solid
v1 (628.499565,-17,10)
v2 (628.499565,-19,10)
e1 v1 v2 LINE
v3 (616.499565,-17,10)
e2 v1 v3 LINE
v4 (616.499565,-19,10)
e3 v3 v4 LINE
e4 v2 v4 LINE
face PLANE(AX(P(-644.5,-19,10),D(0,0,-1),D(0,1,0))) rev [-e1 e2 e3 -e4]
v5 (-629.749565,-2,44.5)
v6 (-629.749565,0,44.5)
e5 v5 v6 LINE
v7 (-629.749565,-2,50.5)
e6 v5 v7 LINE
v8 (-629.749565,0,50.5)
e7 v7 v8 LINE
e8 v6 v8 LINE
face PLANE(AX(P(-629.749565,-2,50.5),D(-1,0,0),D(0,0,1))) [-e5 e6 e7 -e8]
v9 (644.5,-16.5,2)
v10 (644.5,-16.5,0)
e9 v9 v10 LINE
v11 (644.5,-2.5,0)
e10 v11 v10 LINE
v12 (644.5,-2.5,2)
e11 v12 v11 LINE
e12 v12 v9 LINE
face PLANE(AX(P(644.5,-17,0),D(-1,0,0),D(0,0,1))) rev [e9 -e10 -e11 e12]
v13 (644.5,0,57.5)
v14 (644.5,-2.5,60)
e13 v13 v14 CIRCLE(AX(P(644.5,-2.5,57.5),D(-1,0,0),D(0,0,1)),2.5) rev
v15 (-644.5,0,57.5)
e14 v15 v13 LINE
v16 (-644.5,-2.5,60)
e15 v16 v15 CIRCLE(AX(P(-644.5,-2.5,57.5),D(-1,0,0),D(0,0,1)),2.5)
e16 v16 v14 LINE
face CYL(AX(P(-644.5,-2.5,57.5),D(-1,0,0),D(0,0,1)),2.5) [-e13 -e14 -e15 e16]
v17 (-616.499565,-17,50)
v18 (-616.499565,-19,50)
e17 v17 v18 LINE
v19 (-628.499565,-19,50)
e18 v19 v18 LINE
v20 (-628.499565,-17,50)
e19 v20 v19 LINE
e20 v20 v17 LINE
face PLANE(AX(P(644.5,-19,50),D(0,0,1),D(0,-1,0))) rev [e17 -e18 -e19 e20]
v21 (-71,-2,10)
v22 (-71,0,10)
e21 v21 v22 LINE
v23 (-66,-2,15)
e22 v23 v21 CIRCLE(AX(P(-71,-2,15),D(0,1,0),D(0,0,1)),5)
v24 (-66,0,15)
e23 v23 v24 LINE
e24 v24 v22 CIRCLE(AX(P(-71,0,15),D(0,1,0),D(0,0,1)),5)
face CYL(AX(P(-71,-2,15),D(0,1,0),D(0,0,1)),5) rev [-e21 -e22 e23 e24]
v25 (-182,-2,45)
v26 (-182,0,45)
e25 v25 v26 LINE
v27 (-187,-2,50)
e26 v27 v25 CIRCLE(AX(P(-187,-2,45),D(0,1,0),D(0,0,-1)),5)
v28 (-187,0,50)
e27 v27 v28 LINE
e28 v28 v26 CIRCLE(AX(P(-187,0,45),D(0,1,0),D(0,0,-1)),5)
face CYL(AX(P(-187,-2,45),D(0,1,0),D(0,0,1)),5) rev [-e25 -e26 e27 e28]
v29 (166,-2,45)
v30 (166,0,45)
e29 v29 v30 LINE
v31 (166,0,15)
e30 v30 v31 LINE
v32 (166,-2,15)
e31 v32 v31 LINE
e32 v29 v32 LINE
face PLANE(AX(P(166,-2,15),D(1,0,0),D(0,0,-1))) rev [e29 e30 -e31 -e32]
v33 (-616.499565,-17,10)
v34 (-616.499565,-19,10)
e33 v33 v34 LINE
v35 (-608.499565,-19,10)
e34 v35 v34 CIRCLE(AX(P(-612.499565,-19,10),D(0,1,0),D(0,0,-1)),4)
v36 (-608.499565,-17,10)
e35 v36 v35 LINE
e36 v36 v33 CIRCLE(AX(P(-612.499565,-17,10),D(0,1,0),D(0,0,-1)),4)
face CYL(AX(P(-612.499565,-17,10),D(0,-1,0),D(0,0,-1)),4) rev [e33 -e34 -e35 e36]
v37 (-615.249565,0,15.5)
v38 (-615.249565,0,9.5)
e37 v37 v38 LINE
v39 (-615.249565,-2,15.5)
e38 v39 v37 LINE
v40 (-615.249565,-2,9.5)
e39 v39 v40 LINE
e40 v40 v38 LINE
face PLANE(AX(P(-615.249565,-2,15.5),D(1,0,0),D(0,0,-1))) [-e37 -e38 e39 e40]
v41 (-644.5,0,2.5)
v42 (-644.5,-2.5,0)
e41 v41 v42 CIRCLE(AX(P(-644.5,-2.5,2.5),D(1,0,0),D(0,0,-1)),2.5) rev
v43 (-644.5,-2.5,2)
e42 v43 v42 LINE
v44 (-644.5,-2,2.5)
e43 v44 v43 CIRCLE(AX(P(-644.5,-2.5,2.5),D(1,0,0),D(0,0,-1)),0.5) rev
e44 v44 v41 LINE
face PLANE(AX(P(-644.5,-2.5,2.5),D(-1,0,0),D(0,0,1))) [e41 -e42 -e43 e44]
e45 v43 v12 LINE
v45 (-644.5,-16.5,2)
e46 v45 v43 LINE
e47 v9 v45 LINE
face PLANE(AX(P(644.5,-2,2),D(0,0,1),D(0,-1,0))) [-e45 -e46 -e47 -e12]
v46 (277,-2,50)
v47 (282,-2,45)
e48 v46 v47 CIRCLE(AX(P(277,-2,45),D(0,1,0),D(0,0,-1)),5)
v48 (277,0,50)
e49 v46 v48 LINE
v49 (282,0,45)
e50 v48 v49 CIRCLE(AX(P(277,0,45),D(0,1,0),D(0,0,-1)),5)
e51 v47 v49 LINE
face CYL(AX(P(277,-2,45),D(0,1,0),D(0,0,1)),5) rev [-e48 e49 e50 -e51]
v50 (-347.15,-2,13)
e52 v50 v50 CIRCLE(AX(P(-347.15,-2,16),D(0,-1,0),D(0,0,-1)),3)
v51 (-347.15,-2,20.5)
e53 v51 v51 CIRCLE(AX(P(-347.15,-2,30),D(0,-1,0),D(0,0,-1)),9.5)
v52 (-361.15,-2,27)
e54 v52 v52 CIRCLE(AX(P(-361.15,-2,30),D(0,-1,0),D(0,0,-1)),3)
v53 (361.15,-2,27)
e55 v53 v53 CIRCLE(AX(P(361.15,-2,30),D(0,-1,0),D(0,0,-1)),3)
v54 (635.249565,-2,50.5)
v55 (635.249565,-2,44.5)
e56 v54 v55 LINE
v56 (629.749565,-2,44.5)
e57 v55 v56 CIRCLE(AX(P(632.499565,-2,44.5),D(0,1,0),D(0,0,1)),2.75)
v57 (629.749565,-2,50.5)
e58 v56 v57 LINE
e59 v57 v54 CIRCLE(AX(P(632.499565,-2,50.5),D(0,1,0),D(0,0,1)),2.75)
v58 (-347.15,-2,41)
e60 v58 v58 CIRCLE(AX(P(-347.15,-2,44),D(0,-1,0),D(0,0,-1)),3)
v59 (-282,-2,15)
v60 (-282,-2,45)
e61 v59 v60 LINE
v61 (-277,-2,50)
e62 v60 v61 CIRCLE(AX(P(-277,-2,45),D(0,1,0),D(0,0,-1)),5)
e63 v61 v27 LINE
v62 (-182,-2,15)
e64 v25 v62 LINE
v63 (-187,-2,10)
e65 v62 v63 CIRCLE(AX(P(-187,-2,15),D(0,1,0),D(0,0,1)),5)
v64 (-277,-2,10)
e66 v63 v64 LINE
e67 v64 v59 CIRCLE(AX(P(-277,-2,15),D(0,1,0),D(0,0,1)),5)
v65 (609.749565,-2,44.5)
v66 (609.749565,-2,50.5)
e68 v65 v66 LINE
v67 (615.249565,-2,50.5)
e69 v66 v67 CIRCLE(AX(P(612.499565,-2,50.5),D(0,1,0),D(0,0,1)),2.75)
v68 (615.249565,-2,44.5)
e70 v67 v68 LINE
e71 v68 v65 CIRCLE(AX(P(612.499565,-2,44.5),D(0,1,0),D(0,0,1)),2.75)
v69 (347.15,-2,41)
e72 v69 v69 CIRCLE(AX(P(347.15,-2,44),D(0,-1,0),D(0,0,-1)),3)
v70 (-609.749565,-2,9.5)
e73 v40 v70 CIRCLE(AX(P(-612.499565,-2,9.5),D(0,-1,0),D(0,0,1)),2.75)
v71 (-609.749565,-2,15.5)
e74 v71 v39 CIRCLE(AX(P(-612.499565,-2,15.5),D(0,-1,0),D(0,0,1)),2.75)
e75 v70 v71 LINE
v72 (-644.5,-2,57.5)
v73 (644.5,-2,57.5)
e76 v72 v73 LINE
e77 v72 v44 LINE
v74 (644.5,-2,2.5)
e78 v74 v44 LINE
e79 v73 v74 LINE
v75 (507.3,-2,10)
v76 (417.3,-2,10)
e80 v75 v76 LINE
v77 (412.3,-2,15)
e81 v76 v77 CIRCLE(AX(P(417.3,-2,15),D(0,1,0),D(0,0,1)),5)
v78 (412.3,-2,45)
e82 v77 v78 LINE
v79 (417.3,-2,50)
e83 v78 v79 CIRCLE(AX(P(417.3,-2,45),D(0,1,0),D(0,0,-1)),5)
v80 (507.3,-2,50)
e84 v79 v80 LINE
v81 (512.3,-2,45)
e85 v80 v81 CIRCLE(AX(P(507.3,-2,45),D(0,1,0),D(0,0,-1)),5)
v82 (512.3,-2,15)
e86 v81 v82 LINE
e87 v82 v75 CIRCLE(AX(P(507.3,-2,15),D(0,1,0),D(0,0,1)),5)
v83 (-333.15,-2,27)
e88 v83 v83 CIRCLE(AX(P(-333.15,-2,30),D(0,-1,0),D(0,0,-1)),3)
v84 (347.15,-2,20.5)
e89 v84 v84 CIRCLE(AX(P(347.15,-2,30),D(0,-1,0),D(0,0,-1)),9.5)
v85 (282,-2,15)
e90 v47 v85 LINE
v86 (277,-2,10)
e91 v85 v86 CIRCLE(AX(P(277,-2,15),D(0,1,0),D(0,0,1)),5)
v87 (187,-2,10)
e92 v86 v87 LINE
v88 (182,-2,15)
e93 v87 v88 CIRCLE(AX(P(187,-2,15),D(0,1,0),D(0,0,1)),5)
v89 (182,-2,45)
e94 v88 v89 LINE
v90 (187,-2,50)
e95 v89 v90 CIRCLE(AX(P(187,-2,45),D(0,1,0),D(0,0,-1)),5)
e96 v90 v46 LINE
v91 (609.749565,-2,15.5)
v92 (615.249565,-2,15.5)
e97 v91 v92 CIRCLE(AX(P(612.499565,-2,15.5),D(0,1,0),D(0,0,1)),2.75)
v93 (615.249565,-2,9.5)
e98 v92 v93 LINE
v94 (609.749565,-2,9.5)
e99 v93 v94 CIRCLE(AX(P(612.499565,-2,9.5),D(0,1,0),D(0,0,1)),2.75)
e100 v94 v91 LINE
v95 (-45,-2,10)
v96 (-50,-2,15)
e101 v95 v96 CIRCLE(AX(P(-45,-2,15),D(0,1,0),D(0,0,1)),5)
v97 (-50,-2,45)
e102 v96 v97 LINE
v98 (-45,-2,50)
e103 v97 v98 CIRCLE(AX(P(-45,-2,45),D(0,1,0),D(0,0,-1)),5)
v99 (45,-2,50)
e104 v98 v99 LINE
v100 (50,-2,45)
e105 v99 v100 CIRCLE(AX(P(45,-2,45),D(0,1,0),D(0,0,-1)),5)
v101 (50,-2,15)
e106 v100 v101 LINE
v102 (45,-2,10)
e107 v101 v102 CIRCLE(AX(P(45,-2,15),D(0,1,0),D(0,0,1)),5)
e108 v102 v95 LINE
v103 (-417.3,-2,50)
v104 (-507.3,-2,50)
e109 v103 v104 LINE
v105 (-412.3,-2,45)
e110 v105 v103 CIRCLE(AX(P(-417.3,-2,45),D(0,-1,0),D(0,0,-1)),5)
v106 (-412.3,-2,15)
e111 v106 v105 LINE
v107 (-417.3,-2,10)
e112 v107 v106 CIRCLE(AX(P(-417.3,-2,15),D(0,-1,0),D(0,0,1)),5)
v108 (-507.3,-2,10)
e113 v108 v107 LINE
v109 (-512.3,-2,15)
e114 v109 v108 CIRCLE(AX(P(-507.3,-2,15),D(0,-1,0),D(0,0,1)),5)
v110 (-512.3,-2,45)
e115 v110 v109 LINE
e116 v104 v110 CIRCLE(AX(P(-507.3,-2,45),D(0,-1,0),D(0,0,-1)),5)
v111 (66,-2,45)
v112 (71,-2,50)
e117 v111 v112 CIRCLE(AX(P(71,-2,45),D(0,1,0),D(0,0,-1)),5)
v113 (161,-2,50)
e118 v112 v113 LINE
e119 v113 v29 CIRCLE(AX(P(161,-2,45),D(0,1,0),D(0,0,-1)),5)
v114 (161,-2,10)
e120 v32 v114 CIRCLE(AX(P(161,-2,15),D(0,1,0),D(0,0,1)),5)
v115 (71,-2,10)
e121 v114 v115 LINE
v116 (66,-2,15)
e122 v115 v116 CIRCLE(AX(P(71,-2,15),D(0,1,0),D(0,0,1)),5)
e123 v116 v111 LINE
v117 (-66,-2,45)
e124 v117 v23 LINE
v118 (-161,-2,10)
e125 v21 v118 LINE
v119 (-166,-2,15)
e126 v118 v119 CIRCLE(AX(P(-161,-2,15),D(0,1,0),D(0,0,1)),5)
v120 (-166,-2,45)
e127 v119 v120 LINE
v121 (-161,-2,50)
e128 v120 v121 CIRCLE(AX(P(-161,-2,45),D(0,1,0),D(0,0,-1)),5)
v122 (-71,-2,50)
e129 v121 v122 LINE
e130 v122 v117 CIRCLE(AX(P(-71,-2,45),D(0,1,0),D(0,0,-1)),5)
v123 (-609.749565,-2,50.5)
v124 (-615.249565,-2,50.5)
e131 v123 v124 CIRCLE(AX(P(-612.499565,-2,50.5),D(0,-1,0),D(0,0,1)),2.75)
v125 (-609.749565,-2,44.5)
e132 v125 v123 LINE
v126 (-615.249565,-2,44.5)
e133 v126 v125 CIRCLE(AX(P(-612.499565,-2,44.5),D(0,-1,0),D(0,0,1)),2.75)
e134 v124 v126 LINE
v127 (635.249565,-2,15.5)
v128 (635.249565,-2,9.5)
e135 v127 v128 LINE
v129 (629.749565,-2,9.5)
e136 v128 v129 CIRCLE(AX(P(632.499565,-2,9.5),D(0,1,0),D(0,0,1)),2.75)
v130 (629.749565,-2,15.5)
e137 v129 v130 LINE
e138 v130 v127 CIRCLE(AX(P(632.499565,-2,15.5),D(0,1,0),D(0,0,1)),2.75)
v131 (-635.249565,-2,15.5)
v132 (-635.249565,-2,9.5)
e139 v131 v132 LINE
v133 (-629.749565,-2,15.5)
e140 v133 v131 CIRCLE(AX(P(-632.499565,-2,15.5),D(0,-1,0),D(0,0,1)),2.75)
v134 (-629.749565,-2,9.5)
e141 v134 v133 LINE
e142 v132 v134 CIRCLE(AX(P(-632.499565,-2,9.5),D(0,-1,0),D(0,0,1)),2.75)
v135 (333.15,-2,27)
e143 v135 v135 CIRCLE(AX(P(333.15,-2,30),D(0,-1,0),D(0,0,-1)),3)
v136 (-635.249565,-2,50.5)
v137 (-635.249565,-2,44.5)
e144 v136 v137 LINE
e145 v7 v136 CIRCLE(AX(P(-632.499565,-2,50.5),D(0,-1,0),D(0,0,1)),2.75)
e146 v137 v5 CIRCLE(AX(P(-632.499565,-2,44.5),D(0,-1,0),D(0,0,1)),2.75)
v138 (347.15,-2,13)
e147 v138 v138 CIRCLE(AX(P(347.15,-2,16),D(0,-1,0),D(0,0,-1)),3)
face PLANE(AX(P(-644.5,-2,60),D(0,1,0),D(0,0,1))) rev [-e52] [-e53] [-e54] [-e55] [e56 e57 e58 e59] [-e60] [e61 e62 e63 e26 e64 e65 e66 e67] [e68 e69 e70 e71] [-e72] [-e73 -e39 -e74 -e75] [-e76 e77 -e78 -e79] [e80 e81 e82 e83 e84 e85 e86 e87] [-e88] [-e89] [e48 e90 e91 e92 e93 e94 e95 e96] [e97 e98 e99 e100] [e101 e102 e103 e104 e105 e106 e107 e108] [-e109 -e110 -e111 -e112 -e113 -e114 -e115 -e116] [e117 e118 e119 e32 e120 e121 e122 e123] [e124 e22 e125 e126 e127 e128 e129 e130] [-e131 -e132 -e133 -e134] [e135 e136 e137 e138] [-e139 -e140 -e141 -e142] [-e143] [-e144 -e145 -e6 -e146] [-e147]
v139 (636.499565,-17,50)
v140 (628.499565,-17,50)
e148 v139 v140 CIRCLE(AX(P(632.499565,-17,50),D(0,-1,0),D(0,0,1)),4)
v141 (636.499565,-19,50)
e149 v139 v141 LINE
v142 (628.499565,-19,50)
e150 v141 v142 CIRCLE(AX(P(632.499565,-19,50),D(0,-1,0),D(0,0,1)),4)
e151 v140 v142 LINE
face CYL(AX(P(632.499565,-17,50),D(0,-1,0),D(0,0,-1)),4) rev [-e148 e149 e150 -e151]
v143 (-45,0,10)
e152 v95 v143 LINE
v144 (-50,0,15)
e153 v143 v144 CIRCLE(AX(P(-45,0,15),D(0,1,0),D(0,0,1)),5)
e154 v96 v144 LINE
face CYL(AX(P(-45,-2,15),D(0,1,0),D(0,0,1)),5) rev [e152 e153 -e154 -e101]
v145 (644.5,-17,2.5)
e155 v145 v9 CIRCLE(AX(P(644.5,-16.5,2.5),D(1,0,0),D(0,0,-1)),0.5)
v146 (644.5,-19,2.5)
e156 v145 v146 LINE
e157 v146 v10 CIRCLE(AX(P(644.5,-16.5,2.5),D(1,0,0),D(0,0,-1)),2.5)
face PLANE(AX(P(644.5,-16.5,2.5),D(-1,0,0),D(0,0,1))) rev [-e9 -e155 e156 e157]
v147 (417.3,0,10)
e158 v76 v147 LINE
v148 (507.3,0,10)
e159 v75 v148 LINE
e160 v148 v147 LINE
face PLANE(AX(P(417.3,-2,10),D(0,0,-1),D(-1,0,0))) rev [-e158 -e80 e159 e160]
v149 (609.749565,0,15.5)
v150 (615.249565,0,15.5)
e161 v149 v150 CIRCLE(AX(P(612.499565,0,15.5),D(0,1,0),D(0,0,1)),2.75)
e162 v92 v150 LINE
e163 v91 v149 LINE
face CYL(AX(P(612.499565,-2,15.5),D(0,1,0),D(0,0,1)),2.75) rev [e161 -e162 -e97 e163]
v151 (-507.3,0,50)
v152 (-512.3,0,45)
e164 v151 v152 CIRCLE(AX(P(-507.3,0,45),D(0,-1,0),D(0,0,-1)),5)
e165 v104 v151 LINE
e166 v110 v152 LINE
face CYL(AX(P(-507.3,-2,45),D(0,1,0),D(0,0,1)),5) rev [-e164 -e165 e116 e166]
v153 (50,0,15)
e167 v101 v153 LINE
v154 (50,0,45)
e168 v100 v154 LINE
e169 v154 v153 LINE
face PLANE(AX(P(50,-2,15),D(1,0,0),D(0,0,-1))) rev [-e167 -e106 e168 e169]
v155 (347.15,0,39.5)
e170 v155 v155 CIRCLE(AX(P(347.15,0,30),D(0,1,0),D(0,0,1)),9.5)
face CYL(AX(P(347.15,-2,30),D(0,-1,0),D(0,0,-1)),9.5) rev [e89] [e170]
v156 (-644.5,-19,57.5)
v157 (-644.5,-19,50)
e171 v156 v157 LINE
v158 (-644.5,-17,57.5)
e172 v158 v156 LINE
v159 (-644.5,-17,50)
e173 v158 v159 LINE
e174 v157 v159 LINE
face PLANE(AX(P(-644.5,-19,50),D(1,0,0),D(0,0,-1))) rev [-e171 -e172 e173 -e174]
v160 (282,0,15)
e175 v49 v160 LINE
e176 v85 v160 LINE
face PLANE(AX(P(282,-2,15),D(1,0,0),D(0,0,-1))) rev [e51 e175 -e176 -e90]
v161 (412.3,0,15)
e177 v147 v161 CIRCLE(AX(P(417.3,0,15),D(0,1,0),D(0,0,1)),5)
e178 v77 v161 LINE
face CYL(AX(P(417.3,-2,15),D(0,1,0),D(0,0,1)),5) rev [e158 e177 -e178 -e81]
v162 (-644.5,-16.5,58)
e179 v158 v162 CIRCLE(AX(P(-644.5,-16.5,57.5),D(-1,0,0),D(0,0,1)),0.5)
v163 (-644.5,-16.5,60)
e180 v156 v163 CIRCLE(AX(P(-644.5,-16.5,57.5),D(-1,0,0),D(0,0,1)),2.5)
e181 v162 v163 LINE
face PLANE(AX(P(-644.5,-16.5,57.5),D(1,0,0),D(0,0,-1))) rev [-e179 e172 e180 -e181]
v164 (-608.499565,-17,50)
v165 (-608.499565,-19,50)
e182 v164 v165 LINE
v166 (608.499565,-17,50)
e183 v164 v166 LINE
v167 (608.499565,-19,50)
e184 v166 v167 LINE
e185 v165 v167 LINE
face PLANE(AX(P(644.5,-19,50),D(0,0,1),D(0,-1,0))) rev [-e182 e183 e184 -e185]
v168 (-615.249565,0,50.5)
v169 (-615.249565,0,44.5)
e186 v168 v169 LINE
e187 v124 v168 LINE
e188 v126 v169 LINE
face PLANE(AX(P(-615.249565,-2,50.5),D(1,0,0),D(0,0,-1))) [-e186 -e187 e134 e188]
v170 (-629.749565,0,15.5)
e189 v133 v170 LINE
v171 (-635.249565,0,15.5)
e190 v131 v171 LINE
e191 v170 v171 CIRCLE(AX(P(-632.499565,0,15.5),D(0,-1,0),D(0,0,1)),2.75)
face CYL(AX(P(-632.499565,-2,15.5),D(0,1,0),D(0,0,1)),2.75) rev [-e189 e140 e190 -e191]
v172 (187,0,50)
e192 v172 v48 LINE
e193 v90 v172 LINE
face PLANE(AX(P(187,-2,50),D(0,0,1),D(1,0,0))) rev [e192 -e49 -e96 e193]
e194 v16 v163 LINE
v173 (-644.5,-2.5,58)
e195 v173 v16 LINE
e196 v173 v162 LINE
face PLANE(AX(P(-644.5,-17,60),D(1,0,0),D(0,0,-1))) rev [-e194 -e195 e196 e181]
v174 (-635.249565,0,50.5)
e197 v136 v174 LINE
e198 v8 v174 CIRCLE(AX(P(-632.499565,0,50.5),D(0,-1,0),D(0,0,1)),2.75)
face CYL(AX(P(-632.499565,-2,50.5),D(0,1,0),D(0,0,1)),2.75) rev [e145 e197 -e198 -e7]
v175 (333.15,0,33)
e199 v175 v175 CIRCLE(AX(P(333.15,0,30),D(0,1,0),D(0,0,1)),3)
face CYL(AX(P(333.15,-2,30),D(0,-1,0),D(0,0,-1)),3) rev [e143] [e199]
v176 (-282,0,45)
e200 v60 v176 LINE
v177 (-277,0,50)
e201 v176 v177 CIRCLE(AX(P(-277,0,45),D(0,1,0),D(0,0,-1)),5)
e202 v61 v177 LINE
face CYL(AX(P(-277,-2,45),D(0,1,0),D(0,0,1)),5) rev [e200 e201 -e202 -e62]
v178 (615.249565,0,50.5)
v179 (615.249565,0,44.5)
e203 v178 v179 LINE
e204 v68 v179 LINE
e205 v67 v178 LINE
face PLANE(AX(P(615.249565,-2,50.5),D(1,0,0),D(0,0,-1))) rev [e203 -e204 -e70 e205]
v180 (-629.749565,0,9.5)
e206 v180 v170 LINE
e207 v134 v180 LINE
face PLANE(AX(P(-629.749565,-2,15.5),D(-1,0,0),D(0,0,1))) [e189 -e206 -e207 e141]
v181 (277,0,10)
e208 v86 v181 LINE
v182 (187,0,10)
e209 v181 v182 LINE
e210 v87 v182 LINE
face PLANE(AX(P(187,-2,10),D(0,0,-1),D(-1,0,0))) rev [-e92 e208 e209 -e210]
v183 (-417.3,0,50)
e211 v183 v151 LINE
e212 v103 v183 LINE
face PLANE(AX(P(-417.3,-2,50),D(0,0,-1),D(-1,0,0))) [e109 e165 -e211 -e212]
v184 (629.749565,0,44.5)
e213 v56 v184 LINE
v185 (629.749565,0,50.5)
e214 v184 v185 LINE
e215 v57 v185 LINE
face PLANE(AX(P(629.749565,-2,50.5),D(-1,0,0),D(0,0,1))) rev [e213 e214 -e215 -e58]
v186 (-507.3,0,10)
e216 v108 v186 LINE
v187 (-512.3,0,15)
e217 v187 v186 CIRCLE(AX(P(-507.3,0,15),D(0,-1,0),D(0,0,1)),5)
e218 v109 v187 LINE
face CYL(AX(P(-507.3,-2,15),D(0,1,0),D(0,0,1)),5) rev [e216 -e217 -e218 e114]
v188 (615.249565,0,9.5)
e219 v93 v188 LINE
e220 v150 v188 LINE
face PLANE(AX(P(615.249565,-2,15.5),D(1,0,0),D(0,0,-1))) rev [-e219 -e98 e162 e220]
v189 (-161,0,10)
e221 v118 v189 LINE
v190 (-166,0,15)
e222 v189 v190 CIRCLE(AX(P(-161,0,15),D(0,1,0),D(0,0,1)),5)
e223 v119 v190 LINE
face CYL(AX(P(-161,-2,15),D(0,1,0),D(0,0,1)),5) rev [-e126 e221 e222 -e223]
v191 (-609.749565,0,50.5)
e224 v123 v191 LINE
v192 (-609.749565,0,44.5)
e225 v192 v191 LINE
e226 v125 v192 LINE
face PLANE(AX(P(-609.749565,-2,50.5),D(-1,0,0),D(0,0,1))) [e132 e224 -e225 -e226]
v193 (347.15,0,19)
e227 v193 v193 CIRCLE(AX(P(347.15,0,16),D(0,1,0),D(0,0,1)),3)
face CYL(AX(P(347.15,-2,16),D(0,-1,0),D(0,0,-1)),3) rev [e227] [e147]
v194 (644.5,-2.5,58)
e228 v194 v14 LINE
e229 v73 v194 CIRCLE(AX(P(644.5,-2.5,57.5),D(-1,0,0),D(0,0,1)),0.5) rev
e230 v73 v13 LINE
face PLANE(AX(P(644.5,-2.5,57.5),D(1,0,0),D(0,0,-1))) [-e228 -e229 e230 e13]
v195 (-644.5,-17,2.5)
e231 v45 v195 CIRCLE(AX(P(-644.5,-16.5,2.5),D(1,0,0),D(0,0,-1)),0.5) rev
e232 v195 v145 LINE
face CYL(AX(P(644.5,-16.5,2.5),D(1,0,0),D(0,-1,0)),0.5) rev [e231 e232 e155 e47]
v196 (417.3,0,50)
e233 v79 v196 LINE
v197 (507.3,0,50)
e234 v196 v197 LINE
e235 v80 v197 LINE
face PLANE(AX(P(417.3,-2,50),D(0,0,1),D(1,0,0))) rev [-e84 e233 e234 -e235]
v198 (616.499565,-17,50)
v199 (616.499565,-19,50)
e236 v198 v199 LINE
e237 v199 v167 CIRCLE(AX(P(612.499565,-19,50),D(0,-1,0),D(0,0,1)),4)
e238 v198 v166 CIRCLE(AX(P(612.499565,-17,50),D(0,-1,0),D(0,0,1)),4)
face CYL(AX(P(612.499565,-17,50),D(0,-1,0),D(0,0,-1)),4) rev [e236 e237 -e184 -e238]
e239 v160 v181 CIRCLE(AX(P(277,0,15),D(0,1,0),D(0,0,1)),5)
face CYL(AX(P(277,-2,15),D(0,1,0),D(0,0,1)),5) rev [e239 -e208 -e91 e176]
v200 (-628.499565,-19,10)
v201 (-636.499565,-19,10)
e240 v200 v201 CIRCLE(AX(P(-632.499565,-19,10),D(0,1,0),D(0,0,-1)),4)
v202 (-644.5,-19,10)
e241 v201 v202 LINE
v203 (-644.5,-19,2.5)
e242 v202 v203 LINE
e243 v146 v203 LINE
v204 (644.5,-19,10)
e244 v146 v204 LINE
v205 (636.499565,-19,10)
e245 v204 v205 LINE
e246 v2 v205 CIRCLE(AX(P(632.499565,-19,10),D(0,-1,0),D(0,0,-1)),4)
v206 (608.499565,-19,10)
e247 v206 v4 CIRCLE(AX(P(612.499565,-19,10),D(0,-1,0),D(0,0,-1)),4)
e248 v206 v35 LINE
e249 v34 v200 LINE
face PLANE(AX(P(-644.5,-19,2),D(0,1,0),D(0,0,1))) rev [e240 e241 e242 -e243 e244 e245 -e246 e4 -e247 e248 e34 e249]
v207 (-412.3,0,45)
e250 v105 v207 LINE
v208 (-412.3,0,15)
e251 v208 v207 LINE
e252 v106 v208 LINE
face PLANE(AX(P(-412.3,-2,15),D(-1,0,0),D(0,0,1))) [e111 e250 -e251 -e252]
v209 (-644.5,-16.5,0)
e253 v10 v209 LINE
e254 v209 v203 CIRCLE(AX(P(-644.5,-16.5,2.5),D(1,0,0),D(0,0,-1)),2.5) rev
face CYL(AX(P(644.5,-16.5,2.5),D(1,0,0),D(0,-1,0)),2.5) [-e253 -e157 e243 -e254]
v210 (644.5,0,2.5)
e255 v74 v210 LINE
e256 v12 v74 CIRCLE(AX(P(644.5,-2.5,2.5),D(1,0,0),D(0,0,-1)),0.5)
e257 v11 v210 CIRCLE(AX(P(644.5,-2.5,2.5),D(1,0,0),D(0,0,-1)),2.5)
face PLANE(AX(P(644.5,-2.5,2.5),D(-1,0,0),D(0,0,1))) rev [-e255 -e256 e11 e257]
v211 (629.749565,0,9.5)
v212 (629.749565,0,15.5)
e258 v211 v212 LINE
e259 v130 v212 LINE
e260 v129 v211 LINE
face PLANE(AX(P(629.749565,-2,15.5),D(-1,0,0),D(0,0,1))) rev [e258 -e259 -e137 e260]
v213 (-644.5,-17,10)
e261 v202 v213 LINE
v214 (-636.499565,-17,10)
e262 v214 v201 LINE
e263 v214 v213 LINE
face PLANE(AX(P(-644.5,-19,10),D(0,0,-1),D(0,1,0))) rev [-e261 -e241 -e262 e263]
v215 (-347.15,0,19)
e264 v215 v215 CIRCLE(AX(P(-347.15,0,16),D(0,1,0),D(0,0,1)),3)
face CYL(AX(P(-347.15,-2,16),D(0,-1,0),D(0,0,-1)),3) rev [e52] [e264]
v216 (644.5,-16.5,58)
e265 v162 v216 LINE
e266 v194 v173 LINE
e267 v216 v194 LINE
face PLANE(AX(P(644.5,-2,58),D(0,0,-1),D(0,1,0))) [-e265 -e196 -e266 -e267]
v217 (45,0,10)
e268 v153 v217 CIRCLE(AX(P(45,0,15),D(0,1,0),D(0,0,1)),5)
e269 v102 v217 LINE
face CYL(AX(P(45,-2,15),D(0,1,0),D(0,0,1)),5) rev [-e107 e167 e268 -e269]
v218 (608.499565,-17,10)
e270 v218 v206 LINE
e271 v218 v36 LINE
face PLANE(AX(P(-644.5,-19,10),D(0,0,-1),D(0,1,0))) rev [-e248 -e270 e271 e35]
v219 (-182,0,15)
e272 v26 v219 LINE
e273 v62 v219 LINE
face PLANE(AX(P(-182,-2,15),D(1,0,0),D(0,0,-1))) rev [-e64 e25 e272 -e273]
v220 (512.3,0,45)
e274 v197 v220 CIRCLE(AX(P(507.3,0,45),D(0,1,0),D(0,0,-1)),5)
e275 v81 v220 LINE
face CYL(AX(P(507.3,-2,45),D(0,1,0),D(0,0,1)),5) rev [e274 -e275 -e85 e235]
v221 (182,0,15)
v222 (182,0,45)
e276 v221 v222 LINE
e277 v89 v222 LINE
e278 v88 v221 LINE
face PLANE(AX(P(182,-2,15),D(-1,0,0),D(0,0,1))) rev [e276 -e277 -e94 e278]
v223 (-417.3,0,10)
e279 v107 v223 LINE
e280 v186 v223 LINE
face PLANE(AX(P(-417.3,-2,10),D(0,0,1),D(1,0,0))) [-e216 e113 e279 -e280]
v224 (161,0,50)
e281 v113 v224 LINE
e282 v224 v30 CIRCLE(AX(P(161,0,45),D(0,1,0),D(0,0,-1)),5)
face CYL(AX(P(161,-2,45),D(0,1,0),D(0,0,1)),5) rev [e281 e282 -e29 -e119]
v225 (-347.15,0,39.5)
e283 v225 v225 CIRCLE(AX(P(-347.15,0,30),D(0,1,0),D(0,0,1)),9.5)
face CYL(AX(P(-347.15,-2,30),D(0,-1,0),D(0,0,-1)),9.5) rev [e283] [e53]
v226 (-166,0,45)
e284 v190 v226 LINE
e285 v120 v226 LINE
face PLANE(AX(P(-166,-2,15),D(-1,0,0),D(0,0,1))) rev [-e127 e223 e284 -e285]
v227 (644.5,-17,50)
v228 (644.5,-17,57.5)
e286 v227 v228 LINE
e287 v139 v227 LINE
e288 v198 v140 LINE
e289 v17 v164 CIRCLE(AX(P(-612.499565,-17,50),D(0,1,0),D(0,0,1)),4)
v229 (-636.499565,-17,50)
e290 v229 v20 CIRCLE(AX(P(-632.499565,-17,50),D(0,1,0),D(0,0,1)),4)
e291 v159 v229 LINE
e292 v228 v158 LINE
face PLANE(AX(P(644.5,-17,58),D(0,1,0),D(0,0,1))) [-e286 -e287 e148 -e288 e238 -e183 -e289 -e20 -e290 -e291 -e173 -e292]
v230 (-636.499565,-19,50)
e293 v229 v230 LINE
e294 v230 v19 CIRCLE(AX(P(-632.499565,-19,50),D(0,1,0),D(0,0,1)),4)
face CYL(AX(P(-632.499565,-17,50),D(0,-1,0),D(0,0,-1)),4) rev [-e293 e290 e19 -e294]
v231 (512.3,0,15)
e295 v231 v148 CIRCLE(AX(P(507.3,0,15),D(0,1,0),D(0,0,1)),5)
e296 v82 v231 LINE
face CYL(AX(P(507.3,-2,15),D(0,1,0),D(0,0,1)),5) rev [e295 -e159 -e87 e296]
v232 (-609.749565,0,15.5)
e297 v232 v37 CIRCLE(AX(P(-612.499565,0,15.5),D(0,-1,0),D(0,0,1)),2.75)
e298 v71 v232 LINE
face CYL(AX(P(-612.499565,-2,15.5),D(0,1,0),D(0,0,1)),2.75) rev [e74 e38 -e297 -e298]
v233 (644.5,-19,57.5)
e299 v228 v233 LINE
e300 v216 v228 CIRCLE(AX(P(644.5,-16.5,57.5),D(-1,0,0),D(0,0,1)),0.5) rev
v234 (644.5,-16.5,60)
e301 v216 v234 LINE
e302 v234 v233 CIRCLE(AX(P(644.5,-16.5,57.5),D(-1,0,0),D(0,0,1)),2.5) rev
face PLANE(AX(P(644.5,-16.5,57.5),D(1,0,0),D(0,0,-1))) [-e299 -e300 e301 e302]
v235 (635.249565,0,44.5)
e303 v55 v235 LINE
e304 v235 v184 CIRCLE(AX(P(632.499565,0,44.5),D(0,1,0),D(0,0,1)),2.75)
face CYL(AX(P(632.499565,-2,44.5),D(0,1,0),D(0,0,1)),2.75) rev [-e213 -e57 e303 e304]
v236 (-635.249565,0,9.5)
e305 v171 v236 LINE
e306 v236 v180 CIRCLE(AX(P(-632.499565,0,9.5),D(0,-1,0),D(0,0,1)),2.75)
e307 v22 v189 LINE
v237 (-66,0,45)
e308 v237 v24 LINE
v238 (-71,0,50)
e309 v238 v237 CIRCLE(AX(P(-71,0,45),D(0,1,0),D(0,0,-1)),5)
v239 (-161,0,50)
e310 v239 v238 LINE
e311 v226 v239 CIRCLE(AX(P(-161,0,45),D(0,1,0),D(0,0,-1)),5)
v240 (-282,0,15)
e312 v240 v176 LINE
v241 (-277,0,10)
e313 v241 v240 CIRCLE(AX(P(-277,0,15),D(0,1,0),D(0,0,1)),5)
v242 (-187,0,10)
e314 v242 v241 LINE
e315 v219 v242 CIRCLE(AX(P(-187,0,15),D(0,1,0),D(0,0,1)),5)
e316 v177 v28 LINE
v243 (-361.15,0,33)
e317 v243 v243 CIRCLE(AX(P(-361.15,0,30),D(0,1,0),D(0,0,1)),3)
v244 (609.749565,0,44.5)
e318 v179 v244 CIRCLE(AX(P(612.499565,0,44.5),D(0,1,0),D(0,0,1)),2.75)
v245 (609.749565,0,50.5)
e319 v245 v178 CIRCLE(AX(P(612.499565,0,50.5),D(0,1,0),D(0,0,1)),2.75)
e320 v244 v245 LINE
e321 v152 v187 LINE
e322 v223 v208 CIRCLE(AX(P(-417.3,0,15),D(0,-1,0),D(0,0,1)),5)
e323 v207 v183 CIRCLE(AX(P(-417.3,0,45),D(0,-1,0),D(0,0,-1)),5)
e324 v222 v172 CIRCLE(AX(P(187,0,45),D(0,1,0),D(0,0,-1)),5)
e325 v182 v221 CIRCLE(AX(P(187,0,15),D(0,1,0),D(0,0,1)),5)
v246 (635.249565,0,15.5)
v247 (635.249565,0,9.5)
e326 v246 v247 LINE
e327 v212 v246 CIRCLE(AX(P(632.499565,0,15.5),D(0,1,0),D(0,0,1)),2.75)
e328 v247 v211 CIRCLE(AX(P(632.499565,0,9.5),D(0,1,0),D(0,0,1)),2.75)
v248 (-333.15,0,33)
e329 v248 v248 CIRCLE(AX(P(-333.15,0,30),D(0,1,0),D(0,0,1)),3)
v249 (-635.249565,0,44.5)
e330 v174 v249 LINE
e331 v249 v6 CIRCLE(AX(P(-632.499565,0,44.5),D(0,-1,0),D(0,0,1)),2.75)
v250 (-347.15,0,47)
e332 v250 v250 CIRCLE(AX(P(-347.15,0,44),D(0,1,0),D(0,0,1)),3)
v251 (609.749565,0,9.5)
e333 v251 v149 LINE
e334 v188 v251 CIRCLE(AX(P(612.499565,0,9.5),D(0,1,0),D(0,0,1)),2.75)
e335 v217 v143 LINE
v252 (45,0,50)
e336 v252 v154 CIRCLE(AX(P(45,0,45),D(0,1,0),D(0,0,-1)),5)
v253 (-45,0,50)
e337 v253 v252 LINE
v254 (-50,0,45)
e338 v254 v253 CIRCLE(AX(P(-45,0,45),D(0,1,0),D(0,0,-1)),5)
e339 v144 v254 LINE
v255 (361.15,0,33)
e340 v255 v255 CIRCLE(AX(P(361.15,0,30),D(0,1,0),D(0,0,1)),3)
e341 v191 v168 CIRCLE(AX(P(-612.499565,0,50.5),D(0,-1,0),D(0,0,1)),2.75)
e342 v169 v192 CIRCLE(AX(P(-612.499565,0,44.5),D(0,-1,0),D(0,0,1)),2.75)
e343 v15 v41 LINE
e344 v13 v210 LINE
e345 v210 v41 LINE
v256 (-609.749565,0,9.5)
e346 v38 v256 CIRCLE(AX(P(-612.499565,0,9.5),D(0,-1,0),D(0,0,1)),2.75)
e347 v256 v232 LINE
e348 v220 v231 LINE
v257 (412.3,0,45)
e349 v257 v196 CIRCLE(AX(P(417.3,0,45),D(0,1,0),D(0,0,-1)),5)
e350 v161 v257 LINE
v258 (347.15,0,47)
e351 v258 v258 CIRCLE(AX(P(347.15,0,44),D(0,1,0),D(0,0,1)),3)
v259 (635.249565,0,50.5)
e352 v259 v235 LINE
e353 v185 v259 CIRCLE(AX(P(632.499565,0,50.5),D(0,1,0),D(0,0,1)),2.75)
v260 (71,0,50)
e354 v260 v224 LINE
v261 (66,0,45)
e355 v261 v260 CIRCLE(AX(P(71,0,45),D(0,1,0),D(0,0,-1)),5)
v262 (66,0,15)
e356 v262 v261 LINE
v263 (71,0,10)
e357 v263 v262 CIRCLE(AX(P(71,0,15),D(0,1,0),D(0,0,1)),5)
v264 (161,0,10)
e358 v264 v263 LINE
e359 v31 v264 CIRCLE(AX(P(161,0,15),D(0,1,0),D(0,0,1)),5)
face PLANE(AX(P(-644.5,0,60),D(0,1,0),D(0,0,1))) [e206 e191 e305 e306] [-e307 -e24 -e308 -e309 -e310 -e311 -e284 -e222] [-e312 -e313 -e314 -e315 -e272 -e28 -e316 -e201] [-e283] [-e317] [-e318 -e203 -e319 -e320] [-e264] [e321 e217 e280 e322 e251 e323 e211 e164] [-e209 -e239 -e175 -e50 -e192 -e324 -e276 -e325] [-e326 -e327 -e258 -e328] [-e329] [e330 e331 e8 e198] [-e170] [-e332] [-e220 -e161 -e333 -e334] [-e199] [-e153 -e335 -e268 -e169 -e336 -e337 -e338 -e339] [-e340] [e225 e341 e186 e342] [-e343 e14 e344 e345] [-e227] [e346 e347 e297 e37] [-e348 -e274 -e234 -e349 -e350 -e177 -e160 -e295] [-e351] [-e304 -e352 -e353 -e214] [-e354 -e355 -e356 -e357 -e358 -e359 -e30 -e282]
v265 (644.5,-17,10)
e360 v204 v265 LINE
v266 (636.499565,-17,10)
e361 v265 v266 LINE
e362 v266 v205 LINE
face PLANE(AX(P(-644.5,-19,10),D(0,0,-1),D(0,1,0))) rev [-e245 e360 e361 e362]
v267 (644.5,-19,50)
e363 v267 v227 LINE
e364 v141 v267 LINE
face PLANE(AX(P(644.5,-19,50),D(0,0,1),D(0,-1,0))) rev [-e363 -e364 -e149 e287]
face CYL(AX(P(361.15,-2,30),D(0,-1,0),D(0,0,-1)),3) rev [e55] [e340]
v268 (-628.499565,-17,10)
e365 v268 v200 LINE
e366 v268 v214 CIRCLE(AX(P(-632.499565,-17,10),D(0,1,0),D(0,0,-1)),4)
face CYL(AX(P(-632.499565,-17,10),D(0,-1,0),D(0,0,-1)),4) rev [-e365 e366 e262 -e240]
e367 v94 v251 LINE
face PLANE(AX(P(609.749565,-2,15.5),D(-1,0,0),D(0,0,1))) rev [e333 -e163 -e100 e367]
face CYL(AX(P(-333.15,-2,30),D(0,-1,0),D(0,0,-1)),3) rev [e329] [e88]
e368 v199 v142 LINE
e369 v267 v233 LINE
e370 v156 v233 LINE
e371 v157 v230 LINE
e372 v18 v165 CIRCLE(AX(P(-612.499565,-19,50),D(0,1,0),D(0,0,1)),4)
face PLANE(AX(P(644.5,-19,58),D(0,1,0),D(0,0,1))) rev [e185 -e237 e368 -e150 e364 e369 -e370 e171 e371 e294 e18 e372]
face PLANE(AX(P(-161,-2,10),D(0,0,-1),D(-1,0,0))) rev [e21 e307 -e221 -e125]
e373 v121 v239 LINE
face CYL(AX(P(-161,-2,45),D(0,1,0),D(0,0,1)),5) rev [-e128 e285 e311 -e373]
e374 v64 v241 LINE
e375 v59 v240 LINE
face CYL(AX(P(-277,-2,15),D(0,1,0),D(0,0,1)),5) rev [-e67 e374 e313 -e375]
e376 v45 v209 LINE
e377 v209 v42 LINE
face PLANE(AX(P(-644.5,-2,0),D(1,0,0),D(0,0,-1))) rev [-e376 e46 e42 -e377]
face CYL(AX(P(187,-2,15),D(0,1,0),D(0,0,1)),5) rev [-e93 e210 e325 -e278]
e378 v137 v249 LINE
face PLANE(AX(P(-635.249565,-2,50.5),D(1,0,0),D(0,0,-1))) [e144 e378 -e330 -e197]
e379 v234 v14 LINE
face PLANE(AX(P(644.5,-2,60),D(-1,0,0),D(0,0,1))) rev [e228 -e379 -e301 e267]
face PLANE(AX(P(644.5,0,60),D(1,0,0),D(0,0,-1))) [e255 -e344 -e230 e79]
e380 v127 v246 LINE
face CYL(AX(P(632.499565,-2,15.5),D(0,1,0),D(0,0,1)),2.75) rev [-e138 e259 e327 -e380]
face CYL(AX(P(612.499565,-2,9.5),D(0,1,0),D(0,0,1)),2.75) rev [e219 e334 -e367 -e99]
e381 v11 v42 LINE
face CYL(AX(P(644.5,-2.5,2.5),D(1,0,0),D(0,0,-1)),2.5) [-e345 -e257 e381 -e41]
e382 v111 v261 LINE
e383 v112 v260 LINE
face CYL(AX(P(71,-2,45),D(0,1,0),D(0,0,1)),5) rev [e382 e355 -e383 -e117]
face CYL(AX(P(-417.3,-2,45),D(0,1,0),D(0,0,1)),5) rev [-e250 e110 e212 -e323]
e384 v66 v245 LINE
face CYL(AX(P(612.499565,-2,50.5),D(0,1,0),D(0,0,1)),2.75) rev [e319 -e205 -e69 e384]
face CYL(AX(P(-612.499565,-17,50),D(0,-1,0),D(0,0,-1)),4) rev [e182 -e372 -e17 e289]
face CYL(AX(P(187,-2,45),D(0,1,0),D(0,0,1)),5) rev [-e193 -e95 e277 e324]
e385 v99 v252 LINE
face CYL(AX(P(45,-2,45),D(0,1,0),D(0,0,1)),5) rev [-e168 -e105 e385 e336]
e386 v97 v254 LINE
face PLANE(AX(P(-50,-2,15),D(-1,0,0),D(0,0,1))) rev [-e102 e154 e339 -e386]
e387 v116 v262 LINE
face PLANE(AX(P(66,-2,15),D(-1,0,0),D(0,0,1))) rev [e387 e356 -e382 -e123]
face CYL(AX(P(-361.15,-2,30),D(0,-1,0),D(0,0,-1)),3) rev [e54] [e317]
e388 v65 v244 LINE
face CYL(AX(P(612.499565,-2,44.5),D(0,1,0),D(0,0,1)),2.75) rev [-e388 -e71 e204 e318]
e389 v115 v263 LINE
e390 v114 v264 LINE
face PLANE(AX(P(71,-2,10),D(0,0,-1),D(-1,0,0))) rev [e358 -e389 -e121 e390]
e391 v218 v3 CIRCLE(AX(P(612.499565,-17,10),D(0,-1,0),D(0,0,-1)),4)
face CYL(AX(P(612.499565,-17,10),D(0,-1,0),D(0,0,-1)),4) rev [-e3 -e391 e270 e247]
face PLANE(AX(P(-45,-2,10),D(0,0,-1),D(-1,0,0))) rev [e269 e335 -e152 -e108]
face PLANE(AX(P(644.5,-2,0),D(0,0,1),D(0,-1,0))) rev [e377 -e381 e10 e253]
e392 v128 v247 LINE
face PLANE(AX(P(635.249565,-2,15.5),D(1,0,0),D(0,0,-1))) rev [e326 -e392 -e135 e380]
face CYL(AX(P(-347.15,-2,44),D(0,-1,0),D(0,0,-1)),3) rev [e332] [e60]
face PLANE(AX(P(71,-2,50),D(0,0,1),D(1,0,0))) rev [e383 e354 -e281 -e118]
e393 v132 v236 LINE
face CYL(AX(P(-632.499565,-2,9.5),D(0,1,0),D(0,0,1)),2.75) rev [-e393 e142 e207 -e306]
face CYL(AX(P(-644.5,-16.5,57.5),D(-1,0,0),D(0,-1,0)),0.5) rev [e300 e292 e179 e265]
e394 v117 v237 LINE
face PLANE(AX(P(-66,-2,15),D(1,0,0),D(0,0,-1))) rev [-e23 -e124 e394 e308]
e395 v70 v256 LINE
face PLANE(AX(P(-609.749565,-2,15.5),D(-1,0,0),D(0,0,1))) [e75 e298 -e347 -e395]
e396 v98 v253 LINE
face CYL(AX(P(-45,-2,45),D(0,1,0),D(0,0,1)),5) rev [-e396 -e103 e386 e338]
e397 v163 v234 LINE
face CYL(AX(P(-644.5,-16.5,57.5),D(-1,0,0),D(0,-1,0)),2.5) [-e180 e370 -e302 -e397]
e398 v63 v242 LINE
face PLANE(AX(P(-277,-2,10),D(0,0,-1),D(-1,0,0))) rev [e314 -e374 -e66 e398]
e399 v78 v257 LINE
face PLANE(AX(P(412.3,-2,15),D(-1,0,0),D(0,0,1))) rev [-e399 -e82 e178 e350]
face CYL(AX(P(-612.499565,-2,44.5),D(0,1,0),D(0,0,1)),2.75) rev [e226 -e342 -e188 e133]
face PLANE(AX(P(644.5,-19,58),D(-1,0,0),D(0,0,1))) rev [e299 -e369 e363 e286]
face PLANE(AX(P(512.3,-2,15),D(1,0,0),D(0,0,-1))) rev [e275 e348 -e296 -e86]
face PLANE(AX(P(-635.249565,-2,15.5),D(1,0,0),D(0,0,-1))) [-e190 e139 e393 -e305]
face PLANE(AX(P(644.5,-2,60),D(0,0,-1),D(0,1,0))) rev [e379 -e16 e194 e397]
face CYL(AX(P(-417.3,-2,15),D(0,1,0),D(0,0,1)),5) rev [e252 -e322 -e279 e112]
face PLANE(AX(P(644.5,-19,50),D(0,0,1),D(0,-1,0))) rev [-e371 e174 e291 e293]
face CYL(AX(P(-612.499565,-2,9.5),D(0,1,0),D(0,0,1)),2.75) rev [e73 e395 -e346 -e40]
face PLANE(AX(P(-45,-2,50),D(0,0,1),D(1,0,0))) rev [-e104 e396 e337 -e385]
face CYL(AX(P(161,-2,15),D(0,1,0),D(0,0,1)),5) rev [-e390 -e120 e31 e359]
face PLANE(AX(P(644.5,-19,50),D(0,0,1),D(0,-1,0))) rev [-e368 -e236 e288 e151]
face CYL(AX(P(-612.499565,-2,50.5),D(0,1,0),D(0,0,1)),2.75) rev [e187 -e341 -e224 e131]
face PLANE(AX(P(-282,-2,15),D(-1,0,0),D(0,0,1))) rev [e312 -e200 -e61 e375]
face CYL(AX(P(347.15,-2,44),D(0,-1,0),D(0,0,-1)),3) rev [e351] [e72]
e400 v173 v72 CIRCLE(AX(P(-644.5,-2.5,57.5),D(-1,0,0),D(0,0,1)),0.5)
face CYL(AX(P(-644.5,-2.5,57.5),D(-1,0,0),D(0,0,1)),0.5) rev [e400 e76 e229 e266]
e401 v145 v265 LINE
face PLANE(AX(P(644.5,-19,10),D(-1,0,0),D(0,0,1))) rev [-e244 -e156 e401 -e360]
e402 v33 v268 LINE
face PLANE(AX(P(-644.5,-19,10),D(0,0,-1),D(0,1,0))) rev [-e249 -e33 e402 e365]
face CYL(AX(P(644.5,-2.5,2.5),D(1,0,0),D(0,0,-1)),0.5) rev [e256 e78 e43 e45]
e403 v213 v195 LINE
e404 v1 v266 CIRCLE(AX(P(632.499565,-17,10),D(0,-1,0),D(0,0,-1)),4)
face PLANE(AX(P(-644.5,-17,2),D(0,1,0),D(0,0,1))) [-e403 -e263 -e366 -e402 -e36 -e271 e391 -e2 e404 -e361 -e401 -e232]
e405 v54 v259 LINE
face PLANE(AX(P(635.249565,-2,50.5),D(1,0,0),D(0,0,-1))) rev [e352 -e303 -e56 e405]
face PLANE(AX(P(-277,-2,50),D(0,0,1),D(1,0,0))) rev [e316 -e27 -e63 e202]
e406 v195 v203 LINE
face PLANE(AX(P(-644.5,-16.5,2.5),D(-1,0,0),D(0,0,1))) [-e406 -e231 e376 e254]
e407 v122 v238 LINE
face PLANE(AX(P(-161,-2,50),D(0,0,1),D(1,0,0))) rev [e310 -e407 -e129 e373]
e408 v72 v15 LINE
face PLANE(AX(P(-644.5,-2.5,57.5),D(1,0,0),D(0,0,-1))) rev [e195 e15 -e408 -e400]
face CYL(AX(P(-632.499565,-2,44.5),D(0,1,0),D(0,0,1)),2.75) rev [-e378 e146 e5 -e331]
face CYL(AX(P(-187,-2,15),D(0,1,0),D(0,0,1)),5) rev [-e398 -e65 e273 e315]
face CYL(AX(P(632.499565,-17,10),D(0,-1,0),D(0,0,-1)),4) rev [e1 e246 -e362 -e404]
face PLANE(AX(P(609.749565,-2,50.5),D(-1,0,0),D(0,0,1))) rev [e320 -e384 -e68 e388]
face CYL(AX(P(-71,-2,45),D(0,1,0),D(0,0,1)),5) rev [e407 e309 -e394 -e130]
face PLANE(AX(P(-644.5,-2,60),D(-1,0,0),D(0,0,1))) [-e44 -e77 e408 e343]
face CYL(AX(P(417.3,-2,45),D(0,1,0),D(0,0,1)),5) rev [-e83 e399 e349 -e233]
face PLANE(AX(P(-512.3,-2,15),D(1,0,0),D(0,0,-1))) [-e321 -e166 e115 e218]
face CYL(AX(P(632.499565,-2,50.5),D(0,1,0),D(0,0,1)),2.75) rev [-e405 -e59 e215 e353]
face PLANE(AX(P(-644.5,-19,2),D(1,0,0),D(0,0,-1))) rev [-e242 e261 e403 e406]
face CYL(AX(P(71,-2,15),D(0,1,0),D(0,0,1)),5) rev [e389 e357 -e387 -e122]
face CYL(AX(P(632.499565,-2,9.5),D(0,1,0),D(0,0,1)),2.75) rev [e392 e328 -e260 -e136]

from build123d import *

# Parameters (mm, degrees)
SKETCH_1_W                       = 1289
SKETCH_1_H                       = 2
SM_BASE_FLANGE_1_DEPTH           = 60
SM_EDGE_FLANGE_1_STRIP_W         = 9
SM_EDGE_FLANGE_1_STRIP_H         = 2
SM_EDGE_FLANGE_1_STRIP_CUT_DEPTH = 1289
SM_EDGE_FLANGE_1_DEPTH           = 1289
SM_EDGE_FLANGE_2_STRIP_W         = 9
SM_EDGE_FLANGE_2_STRIP_H         = 2
SM_EDGE_FLANGE_2_STRIP_CUT_DEPTH = 1289
SM_EDGE_FLANGE_2_DEPTH           = 1289
SM_EDGE_FLANGE_3_STRIP_W         = 9
SM_EDGE_FLANGE_3_STRIP_H         = 2
SM_EDGE_FLANGE_3_STRIP_CUT_DEPTH = 1289
SM_EDGE_FLANGE_3_DEPTH           = 1289
SM_EDGE_FLANGE_4_STRIP_W         = 9
SM_EDGE_FLANGE_4_STRIP_H         = 2
SM_EDGE_FLANGE_4_STRIP_CUT_DEPTH = 1289
SM_EDGE_FLANGE_4_DEPTH           = 1289
HOLE_WIZARD_19_0_19_1_D          = 19
HOLE_WIZARD_6_0_6_1_AT_2_COUNT   = 2
HOLE_WIZARD_6_0_6_1_AT_2_PITCH   = 28
HOLE_WIZARD_6_0_6_1_AT_3_COUNT   = 2
HOLE_WIZARD_6_0_6_1_AT_3_PITCH   = 19.798989873
HOLE_WIZARD_6_0_6_1_AT_4_COUNT   = 2
HOLE_WIZARD_6_0_6_1_AT_4_PITCH   = 19.798989873
PATTERN_LINEAR_1_COUNT           = 2
PATTERN_LINEAR_1_PITCH           = 694.3
CUT_EXTRUDE_1_DEPTH              = 2
PATTERN_LINEAR_2_COUNT           = 2
PATTERN_LINEAR_2_PITCH           = 20
PATTERN_LINEAR_2_COUNT_DIR2      = 2
PATTERN_LINEAR_2_PITCH_DIR2      = 35
CUT_EXTRUDE_4_DEPTH              = 2
MIRROR_1_COPY_1_DEPTH            = 2
MIRROR_1_COPY_2_DEPTH            = 2
MIRROR_1_COPY_3_DEPTH            = 2
CUT_EXTRUDE_2_DEPTH              = 2
PATTERN_LINEAR_3_COUNT           = 5
PATTERN_LINEAR_3_PITCH           = 116
MIRROR_3_COPY_1_DEPTH            = 2
MIRROR_3_COPY_2_DEPTH            = 2


# Sheet-metal steps are written as plain solids
with BuildPart() as part:
    # Sketch 1 → 基体-法兰1 (new body)
    with BuildSketch(Plane.XY):
        with Locations((0, -1)):
            Rectangle(SKETCH_1_W, SKETCH_1_H)
    extrude(amount=SM_BASE_FLANGE_1_DEPTH)

    # 边线-法兰1 strip (across the edge) → 边线-法兰1 strip cut (cut)
    with BuildSketch(Plane(origin=(-644.5, -2, 0), x_dir=(0, 0, 1), z_dir=(1, 0, 0))):
        with Locations((-2, -1)):
            Rectangle(SM_EDGE_FLANGE_1_STRIP_W, SM_EDGE_FLANGE_1_STRIP_H)
    extrude(amount=SM_EDGE_FLANGE_1_STRIP_CUT_DEPTH, mode=Mode.SUBTRACT)

    # 边线-法兰1 section (across the edge) → 边线-法兰1 (add)
    with BuildSketch(Plane(origin=(-644.5, -2, 0), x_dir=(0, 0, 1), z_dir=(1, 0, 0))):
        with BuildLine():
            Line((0, 0.5), (0, 15))
            Line((0, 15), (2, 15))
            Line((2, 15), (2, 0.5))
            ThreePointArc((2, 0.5), (2.146446609, 0.146446609), (2.5, 0))
            Line((2.5, 0), (2.5, -2))
            ThreePointArc((2.5, -2), (0.732233047, -1.267766953), (0, 0.5))
        make_face()
    extrude(amount=SM_EDGE_FLANGE_1_DEPTH)

    # 边线-法兰2 strip (across the edge) → 边线-法兰2 strip cut (cut)
    with BuildSketch(Plane(origin=(644.5, -2, 60), x_dir=(0, 0, -1), z_dir=(-1, 0, 0))):
        with Locations((-2, -1)):
            Rectangle(SM_EDGE_FLANGE_2_STRIP_W, SM_EDGE_FLANGE_2_STRIP_H)
    extrude(amount=SM_EDGE_FLANGE_2_STRIP_CUT_DEPTH, mode=Mode.SUBTRACT)

    # 边线-法兰2 section (across the edge) → 边线-法兰2 (add)
    with BuildSketch(Plane(origin=(644.5, -2, 60), x_dir=(0, 0, -1), z_dir=(-1, 0, 0))):
        with BuildLine():
            Line((0, 0.5), (0, 15))
            Line((0, 15), (2, 15))
            Line((2, 15), (2, 0.5))
            ThreePointArc((2, 0.5), (2.146446609, 0.146446609), (2.5, 0))
            Line((2.5, 0), (2.5, -2))
            ThreePointArc((2.5, -2), (0.732233047, -1.267766953), (0, 0.5))
        make_face()
    extrude(amount=SM_EDGE_FLANGE_2_DEPTH)

    # 边线-法兰3 strip (across the edge) → 边线-法兰3 strip cut (cut)
    with BuildSketch(Plane(origin=(644.5, -17, 58), x_dir=(0, 1, 0), z_dir=(-1, 0, 0))):
        with Locations((-4, -1)):
            Rectangle(SM_EDGE_FLANGE_3_STRIP_W, SM_EDGE_FLANGE_3_STRIP_H)
    extrude(amount=SM_EDGE_FLANGE_3_STRIP_CUT_DEPTH, mode=Mode.SUBTRACT)

    # 边线-法兰3 section (across the edge) → 边线-法兰3 (add)
    with BuildSketch(Plane(origin=(644.5, -17, 58), x_dir=(0, 1, 0), z_dir=(-1, 0, 0))):
        with BuildLine():
            Line((-2, 0.5), (-2, 8))
            Line((-2, 8), (0, 8))
            Line((0, 8), (0, 0.5))
            ThreePointArc((0, 0.5), (0.146446609, 0.146446609), (0.5, 0))
            Line((0.5, 0), (0.5, -2))
            ThreePointArc((0.5, -2), (-1.267766953, -1.267766953), (-2, 0.5))
        make_face()
    extrude(amount=SM_EDGE_FLANGE_3_DEPTH)

    # 边线-法兰4 strip (across the edge) → 边线-法兰4 strip cut (cut)
    with BuildSketch(Plane(origin=(-644.5, -17, 2), x_dir=(0, 1, 0), z_dir=(1, 0, 0))):
        with Locations((-4, -1)):
            Rectangle(SM_EDGE_FLANGE_4_STRIP_W, SM_EDGE_FLANGE_4_STRIP_H)
    extrude(amount=SM_EDGE_FLANGE_4_STRIP_CUT_DEPTH, mode=Mode.SUBTRACT)

    # 边线-法兰4 section (across the edge) → 边线-法兰4 (add)
    with BuildSketch(Plane(origin=(-644.5, -17, 2), x_dir=(0, 1, 0), z_dir=(1, 0, 0))):
        with BuildLine():
            Line((-2, 0.5), (-2, 8))
            Line((-2, 8), (0, 8))
            Line((0, 8), (0, 0.5))
            ThreePointArc((0, 0.5), (0.146446609, 0.146446609), (0.5, 0))
            Line((0.5, 0), (0.5, -2))
            ThreePointArc((0.5, -2), (-1.267766953, -1.267766953), (-2, 0.5))
        make_face()
    extrude(amount=SM_EDGE_FLANGE_4_DEPTH)

    # Ø19.0 (19) 直径孔1 (through all)
    with Locations(Plane.XZ.offset(2)):
        with Locations((-347.15, 30), (347.15, 30)):
            Hole(HOLE_WIZARD_19_0_19_1_D / 2)

    # 草图17 → Ø6.0 (6) 直径孔1 (revolve, cut)
    with BuildSketch(Plane(origin=(-361.15, -2, 30), x_dir=(0, 0, -1), z_dir=(1, 0, 0))):
        Polygon((0, 0), (0, 6.802581857), (3, 5), (3, 0), align=None)
    hole_wizard_6_0_6_1 = revolve(axis=Axis((-361.15, -8.35, 30), (0, 1, 0)), mode=Mode.SUBTRACT)

    # Ø6.0 (6) 直径孔1 at 2: Ø6.0 (6) 直径孔1 ×2
    with Locations(*[(i * HOLE_WIZARD_6_0_6_1_AT_2_PITCH, 0, 0) for i in range(1, HOLE_WIZARD_6_0_6_1_AT_2_COUNT)]):
        add(hole_wizard_6_0_6_1, mode=Mode.SUBTRACT)

    # Ø6.0 (6) 直径孔1 at 3: Ø6.0 (6) 直径孔1 ×2
    with Locations(*[Vector(0.707106781186549, 0, 0.7071067811865461) * (i * HOLE_WIZARD_6_0_6_1_AT_3_PITCH) for i in range(1, HOLE_WIZARD_6_0_6_1_AT_3_COUNT)]):
        add(hole_wizard_6_0_6_1, mode=Mode.SUBTRACT)

    # Ø6.0 (6) 直径孔1 at 4: Ø6.0 (6) 直径孔1 ×2
    with Locations(*[Vector(0.707106781186549, 0, -0.7071067811865461) * (i * HOLE_WIZARD_6_0_6_1_AT_4_PITCH) for i in range(1, HOLE_WIZARD_6_0_6_1_AT_4_COUNT)]):
        add(hole_wizard_6_0_6_1, mode=Mode.SUBTRACT)

    # 阵列(线性)1: Ø6.0 (6) 直径孔1 ×2
    with Locations(*[(i * PATTERN_LINEAR_1_PITCH, 0, 0) for i in range(1, PATTERN_LINEAR_1_COUNT)]):
        add(hole_wizard_6_0_6_1, mode=Mode.SUBTRACT)

    # 阵列(线性)1 copy 1 sketch → 阵列(线性)1 copy 1 (revolve, cut)
    with BuildSketch(Plane(origin=(361.15, -2, 30), x_dir=(0, 0, -1), z_dir=(1, 0, 0))):
        Polygon((0, 0), (0, 6.802581857), (3, 5), (3, 0), align=None)
    revolve(axis=Axis((361.15, -8.35, 30), (0, 1, 0)), mode=Mode.SUBTRACT)

    # 阵列(线性)1 copy 2 sketch → 阵列(线性)1 copy 2 (revolve, cut)
    with BuildSketch(Plane(origin=(347.15, -2, 44), x_dir=(0, 0, -1), z_dir=(1, 0, 0))):
        Polygon((0, 0), (0, 6.802581857), (3, 5), (3, 0), align=None)
    revolve(axis=Axis((347.15, -8.35, 44), (0, 1, 0)), mode=Mode.SUBTRACT)

    # 阵列(线性)1 copy 3 sketch → 阵列(线性)1 copy 3 (revolve, cut)
    with BuildSketch(Plane(origin=(347.15, -2, 16), x_dir=(0, 0, -1), z_dir=(1, 0, 0))):
        Polygon((0, 0), (0, 6.802581857), (3, 5), (3, 0), align=None)
    revolve(axis=Axis((347.15, -8.35, 16), (0, 1, 0)), mode=Mode.SUBTRACT)

    # 草图19 → 切除-拉伸1 (cut)
    with BuildSketch(Plane(origin=(0, 0, 0), x_dir=(1, 0, 0), z_dir=(0, 1, 0))):
        with BuildLine():
            Line((609.749565443, -15.5), (609.749565443, -9.5))
            ThreePointArc((609.749565443, -9.5), (612.499565443, -6.75), (615.249565443, -9.5))
            Line((615.249565443, -9.5), (615.249565443, -15.5))
            ThreePointArc((615.249565443, -15.5), (612.499565443, -18.25), (609.749565443, -15.5))
        make_face()
    cut_extrude_1 = extrude(amount=-CUT_EXTRUDE_1_DEPTH, mode=Mode.SUBTRACT)

    # 阵列(线性)2: Cut-Extrude 1 2 × 2
    with Locations(*[(i * PATTERN_LINEAR_2_PITCH, 0, j * PATTERN_LINEAR_2_PITCH_DIR2) for i in range(PATTERN_LINEAR_2_COUNT) for j in range(PATTERN_LINEAR_2_COUNT_DIR2) if (i, j) != (0, 0)]):
        add(cut_extrude_1, mode=Mode.SUBTRACT)

    # 草图23 → 切除-拉伸4 (cut)
    with BuildSketch(Plane.XZ.offset(19)):
        with BuildLine():
            Line((616.499565443, 10), (608.499565443, 10))
            ThreePointArc((608.499565443, 10), (612.499565443, 6), (616.499565443, 10))
        make_face()
        with BuildLine():
            Line((636.499565443, 10), (628.499565443, 10))
            ThreePointArc((628.499565443, 10), (632.499565443, 6), (636.499565443, 10))
        make_face()
        with BuildLine():
            Line((636.499565443, 50), (628.499565443, 50))
            ThreePointArc((628.499565443, 50), (632.499565443, 54), (636.499565443, 50))
        make_face()
        with BuildLine():
            Line((616.499565443, 50), (608.499565443, 50))
            ThreePointArc((608.499565443, 50), (612.499565443, 54), (616.499565443, 50))
        make_face()
    cut_extrude_4 = extrude(amount=-CUT_EXTRUDE_4_DEPTH, mode=Mode.SUBTRACT)

    # 镜向1: 切除-拉伸1, 切除-拉伸4 across plane
    add(cut_extrude_1.mirror(Plane(origin=(0, 0, 0), x_dir=(0, 0, 1), z_dir=(1, 0, 0))), mode=Mode.SUBTRACT)
    add(cut_extrude_4.mirror(Plane(origin=(0, 0, 0), x_dir=(0, 0, 1), z_dir=(1, 0, 0))), mode=Mode.SUBTRACT)

    # 镜向1 copy 1 sketch → 镜向1 copy 1 (cut)
    with BuildSketch(Plane(origin=(0, 0, 35), x_dir=(-1, 0, 0), z_dir=(0, 1, 0))):
        with BuildLine():
            Line((609.749565443, 15.5), (609.749565443, 9.5))
            ThreePointArc((609.749565443, 9.5), (612.499565443, 6.75), (615.249565443, 9.5))
            Line((615.249565443, 9.5), (615.249565443, 15.5))
            ThreePointArc((615.249565443, 15.5), (612.499565443, 18.25), (609.749565443, 15.5))
        make_face()
    extrude(amount=-MIRROR_1_COPY_1_DEPTH, mode=Mode.SUBTRACT)

    # 镜向1 copy 2 sketch → 镜向1 copy 2 (cut)
    with BuildSketch(Plane(origin=(-20, 0, 0), x_dir=(-1, 0, 0), z_dir=(0, 1, 0))):
        with BuildLine():
            Line((609.749565443, 15.5), (609.749565443, 9.5))
            ThreePointArc((609.749565443, 9.5), (612.499565443, 6.75), (615.249565443, 9.5))
            Line((615.249565443, 9.5), (615.249565443, 15.5))
            ThreePointArc((615.249565443, 15.5), (612.499565443, 18.25), (609.749565443, 15.5))
        make_face()
    extrude(amount=-MIRROR_1_COPY_2_DEPTH, mode=Mode.SUBTRACT)

    # 镜向1 copy 3 sketch → 镜向1 copy 3 (cut)
    with BuildSketch(Plane(origin=(-20, 0, 35), x_dir=(-1, 0, 0), z_dir=(0, 1, 0))):
        with BuildLine():
            Line((609.749565443, 15.5), (609.749565443, 9.5))
            ThreePointArc((609.749565443, 9.5), (612.499565443, 6.75), (615.249565443, 9.5))
            Line((615.249565443, 9.5), (615.249565443, 15.5))
            ThreePointArc((615.249565443, 15.5), (612.499565443, 18.25), (609.749565443, 15.5))
        make_face()
    extrude(amount=-MIRROR_1_COPY_3_DEPTH, mode=Mode.SUBTRACT)

    # 草图20 → 切除-拉伸2 (cut)
    with BuildSketch(Plane(origin=(0, 0, 0), x_dir=(1, 0, 0), z_dir=(0, 1, 0))):
        with BuildLine():
            Line((-277, -10), (-187, -10))
            ThreePointArc((-187, -10), (-183.464466094, -11.464466094), (-182, -15))
            Line((-182, -15), (-182, -45))
            ThreePointArc((-182, -45), (-183.464466094, -48.535533906), (-187, -50))
            Line((-187, -50), (-277, -50))
            ThreePointArc((-277, -50), (-280.535533906, -48.535533906), (-282, -45))
            Line((-282, -45), (-282, -15))
            ThreePointArc((-282, -15), (-280.535533906, -11.464466094), (-277, -10))
        make_face()
    cut_extrude_2 = extrude(amount=-CUT_EXTRUDE_2_DEPTH, mode=Mode.SUBTRACT)

    # 阵列(线性)3: 切除-拉伸2 ×5
    with Locations(*[(i * PATTERN_LINEAR_3_PITCH, 0, 0) for i in range(1, PATTERN_LINEAR_3_COUNT)]):
        add(cut_extrude_2, mode=Mode.SUBTRACT)

    # 镜向2: 切除-拉伸2 across plane
    add(cut_extrude_2.mirror(Plane.ZY.offset(347.15)), mode=Mode.SUBTRACT)

    # 镜向3 copy 1 sketch → 镜向3 copy 1 (cut)
    with BuildSketch(Plane(origin=(694.3, 0, 0), x_dir=(1, 0, 0), z_dir=(0, 1, 0))):
        with BuildLine():
            Line((-277, -10), (-187, -10))
            ThreePointArc((-187, -10), (-183.464466094, -11.464466094), (-182, -15))
            Line((-182, -15), (-182, -45))
            ThreePointArc((-182, -45), (-183.464466094, -48.535533906), (-187, -50))
            Line((-187, -50), (-277, -50))
            ThreePointArc((-277, -50), (-280.535533906, -48.535533906), (-282, -45))
            Line((-282, -45), (-282, -15))
            ThreePointArc((-282, -15), (-280.535533906, -11.464466094), (-277, -10))
        make_face()
    extrude(amount=-MIRROR_3_COPY_1_DEPTH, mode=Mode.SUBTRACT)

    # 镜向3 copy 2 sketch → 镜向3 copy 2 (cut)
    with BuildSketch(Plane(origin=(0, 0, 0), x_dir=(-1, 0, 0), z_dir=(0, 1, 0))):
        with BuildLine():
            Line((-277, 10), (-187, 10))
            ThreePointArc((-187, 10), (-183.464466094, 11.464466094), (-182, 15))
            Line((-182, 15), (-182, 45))
            ThreePointArc((-182, 45), (-183.464466094, 48.535533906), (-187, 50))
            Line((-187, 50), (-277, 50))
            ThreePointArc((-277, 50), (-280.535533906, 48.535533906), (-282, 45))
            Line((-282, 45), (-282, 15))
            ThreePointArc((-282, 15), (-280.535533906, 11.464466094), (-277, 10))
        make_face()
    extrude(amount=-MIRROR_3_COPY_2_DEPTH, mode=Mode.SUBTRACT)


solid = part.part
